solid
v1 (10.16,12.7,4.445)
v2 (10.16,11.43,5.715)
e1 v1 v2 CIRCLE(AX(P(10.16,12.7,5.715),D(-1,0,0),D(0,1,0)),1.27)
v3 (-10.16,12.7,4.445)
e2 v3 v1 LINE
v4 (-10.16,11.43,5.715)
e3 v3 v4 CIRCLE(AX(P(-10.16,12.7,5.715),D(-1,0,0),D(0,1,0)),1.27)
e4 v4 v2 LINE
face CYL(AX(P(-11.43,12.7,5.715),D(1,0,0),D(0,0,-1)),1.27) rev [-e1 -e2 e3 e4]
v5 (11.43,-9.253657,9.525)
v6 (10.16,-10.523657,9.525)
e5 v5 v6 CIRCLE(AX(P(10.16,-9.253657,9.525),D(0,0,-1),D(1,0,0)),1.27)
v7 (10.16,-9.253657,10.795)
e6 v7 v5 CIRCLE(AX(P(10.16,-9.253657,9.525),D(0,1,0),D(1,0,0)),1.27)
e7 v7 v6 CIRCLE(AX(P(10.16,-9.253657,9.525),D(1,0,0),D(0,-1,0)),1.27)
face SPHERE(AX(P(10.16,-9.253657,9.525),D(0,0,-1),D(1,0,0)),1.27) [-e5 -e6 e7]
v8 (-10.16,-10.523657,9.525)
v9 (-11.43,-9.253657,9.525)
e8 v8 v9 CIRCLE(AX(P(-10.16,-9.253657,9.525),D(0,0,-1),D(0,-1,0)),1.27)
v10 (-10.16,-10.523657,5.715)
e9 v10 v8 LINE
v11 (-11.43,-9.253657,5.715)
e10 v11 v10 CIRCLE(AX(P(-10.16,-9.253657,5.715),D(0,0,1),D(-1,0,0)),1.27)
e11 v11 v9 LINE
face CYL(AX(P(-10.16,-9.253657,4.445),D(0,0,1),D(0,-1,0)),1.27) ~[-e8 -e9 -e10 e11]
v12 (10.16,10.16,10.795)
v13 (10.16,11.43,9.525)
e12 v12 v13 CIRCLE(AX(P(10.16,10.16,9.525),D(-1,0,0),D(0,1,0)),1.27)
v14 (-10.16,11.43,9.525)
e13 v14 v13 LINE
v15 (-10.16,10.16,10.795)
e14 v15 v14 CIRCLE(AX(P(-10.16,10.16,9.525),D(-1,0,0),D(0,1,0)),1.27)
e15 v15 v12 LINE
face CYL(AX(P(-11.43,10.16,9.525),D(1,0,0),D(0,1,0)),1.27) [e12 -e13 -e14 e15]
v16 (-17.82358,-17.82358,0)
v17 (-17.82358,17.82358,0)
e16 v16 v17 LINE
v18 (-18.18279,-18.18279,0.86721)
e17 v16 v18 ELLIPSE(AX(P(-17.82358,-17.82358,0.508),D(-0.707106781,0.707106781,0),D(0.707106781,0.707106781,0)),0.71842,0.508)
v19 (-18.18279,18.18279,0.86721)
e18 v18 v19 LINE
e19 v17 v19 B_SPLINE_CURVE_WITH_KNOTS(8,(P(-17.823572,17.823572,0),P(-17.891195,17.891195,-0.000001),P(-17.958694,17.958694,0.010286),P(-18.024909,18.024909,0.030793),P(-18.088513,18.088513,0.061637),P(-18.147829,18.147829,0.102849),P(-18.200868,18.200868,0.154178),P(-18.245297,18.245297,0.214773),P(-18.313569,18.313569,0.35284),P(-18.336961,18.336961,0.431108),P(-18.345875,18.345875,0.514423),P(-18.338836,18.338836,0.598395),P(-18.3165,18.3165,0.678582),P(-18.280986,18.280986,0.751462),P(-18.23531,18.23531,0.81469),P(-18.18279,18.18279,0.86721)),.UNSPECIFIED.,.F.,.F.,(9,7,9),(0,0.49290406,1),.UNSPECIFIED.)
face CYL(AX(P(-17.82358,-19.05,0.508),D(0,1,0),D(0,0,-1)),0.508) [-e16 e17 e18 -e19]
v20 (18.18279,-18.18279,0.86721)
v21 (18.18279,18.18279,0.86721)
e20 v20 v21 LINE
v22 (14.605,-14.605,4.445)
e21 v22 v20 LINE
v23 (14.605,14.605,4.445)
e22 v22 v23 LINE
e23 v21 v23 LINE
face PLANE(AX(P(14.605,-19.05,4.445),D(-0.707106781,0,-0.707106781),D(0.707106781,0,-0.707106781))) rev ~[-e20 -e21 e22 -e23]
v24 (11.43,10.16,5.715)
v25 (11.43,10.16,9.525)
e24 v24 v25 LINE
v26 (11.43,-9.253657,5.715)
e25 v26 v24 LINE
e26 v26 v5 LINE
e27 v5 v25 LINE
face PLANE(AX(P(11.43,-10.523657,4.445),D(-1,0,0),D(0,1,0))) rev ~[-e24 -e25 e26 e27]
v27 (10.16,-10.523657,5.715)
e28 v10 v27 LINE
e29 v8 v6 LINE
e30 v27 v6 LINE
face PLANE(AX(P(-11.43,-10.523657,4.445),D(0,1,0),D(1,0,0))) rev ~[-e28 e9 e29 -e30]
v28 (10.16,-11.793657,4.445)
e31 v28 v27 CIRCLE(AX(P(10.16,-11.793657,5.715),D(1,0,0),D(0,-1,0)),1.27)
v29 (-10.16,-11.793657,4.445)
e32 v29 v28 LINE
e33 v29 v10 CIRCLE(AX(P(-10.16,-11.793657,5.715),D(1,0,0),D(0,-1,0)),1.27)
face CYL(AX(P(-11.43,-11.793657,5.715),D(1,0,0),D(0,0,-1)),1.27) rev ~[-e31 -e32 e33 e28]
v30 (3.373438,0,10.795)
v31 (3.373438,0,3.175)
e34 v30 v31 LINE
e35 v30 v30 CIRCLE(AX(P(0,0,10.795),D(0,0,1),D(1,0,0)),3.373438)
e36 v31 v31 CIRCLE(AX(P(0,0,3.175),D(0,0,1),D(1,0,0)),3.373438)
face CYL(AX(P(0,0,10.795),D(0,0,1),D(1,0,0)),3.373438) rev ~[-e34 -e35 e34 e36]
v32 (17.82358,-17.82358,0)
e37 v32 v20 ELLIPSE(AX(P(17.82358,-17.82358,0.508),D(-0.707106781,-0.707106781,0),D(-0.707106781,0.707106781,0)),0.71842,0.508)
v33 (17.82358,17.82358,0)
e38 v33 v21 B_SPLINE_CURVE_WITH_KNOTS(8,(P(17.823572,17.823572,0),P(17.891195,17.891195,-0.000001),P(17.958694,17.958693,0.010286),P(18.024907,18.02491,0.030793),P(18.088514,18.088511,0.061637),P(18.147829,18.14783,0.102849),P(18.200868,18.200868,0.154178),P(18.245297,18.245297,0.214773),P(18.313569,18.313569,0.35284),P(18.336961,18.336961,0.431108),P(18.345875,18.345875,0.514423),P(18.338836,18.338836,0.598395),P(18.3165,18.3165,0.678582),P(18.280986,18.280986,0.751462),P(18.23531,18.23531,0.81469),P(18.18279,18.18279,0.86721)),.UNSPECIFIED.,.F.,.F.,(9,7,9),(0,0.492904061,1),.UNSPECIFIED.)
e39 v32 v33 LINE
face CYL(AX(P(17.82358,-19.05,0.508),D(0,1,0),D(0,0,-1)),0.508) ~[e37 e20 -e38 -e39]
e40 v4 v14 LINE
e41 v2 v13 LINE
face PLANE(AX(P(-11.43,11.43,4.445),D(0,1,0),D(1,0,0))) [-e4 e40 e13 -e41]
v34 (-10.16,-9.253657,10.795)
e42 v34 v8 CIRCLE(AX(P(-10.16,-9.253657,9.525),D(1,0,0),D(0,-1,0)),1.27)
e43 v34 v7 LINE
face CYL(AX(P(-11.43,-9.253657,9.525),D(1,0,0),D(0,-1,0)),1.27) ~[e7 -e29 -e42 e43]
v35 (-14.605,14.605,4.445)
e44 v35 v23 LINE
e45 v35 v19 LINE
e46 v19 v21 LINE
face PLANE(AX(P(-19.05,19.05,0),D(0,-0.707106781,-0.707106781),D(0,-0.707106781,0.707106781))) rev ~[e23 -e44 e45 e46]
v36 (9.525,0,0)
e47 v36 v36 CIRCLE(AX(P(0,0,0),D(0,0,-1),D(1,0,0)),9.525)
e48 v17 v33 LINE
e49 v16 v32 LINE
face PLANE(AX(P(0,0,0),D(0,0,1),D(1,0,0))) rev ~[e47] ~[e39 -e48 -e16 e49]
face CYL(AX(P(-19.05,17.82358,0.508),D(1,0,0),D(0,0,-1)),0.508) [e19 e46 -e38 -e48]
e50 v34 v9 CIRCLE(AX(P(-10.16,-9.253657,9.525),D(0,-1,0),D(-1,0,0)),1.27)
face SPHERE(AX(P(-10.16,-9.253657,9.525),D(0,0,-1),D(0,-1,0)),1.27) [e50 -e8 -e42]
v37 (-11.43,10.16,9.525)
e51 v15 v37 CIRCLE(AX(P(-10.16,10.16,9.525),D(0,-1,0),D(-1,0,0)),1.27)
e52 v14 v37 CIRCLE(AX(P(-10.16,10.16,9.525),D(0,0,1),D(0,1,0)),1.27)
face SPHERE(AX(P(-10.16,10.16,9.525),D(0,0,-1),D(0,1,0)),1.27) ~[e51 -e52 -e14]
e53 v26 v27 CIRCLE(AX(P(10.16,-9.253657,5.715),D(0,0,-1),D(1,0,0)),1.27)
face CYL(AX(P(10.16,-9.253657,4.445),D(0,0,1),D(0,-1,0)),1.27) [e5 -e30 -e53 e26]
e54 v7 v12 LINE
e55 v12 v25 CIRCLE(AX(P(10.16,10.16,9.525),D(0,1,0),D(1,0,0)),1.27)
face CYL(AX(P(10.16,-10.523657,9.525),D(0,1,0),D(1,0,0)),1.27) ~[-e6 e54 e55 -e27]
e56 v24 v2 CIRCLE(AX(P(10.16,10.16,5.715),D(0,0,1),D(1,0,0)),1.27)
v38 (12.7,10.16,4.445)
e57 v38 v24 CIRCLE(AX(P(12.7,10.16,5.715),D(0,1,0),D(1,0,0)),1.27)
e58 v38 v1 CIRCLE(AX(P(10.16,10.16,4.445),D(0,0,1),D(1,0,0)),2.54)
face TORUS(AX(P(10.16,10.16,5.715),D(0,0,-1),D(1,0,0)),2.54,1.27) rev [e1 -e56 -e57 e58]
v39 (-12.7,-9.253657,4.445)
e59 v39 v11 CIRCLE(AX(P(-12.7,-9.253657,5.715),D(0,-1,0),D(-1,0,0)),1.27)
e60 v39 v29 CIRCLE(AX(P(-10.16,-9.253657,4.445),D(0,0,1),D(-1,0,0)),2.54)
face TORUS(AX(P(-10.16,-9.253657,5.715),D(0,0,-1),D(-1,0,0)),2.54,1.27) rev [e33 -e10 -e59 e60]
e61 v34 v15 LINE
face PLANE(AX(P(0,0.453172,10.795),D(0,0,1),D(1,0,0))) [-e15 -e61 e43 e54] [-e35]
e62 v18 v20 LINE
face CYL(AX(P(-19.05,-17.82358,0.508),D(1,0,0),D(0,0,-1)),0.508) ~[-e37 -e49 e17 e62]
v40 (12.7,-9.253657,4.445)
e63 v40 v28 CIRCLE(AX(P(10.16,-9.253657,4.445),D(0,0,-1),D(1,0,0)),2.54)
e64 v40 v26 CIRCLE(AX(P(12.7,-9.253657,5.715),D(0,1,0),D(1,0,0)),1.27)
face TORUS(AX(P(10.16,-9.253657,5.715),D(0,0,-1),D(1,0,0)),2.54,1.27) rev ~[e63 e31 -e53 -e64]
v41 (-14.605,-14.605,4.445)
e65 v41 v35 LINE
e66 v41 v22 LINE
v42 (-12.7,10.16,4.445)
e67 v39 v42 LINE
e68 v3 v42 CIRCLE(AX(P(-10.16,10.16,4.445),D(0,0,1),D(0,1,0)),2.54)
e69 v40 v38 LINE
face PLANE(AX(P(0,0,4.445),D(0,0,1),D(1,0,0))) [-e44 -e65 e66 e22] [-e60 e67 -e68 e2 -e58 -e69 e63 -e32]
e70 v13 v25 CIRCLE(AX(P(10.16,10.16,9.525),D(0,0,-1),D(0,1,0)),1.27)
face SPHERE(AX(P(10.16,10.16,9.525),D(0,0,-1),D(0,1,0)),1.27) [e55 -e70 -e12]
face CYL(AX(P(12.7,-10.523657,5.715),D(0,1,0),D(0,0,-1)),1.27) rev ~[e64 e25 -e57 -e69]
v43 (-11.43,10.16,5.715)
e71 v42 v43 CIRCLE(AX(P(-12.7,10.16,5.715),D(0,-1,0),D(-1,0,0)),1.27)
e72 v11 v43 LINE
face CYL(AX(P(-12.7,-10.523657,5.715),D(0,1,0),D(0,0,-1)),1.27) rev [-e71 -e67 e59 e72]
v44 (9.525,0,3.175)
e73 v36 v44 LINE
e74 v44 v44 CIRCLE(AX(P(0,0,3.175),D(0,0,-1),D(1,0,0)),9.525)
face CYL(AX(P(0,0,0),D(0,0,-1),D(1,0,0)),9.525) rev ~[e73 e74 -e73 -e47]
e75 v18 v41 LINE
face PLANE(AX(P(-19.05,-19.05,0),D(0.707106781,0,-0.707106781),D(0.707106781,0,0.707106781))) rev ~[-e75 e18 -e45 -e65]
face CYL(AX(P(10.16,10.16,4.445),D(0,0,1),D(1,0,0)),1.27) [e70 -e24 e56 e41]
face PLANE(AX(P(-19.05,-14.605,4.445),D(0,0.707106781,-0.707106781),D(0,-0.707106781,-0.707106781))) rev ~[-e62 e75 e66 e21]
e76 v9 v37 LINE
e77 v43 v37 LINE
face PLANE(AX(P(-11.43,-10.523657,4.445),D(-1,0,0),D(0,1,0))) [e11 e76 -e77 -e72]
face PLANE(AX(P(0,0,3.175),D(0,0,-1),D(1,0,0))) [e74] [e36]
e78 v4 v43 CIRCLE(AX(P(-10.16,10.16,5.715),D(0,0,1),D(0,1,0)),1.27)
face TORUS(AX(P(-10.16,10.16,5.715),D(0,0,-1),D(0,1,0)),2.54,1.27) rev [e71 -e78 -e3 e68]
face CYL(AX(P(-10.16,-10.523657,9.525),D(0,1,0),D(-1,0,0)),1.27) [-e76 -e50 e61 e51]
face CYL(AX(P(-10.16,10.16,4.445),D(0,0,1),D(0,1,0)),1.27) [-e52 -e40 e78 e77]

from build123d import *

# Parameters (mm, degrees)
F0_W      = 38.1
F0_H      = 38.1
F1_DEPTH  = 4.445
F4_DEPTH  = 38.101
F5_DEPTH  = 38.101
F6_R      = 0.508
F7_W      = 22.86
F7_H      = 21.9536569705
F8_DEPTH  = 6.35
F9_R      = 3.3734375
F10_DEPTH = 10.7965917968
F11_R     = 9.525
F12_DEPTH = 3.175
F13_R     = 1.27


with BuildPart() as f1:
    # F0 (on Top) → F1 (new body)
    with BuildSketch(Plane.XY):
        Rectangle(F0_W, F0_H)
    extrude(amount=F1_DEPTH)

    # F2 (on face) → F4 (cut, through all)
    with BuildSketch(Plane.XZ.offset(19.05)):
        Polygon((-19.05, 4.445), (-19.05, 0), (-14.605, 4.445), align=None)
        Polygon((14.605, 4.445), (19.05, 0), (19.05, 4.445), align=None)
    extrude(amount=-F4_DEPTH, mode=Mode.SUBTRACT)

    # F3 (on face) → F5 (cut, through all)
    with BuildSketch(Plane(origin=(-19.05, 0, 0), x_dir=(0, -1, 0), z_dir=(-1, 0, 0))):
        Polygon((-19.05, 4.445), (-19.05, 0), (-14.605, 4.445), align=None)
        Polygon((14.605, 4.445), (19.05, 0), (19.05, 4.445), align=None)
    extrude(amount=-F5_DEPTH, mode=Mode.SUBTRACT)

    # F6
    f6_edges = [f1.edges().sort_by_distance(p)[0] for p in [
        (19.05, 0, 0),
        (0, -19.05, 0),
        (-19.05, 0, 0),
        (0, 19.05, 0),
    ]]
    fillet(f6_edges, radius=F6_R)

    # F7 (on face) → F8 (join)
    with BuildSketch(Plane.XY.offset(4.445)):
        with Locations((0, 0.4531715147)):
            Rectangle(F7_W, F7_H)
    extrude(amount=F8_DEPTH)

    # F9 (on face) → F10 (cut, through all)
    with BuildSketch(Plane.XY.offset(10.795)):
        Circle(F9_R)
    extrude(amount=-F10_DEPTH, mode=Mode.SUBTRACT)

    # F11 (on face) → F12 (cut)
    with BuildSketch(Plane(origin=(0, 0, 0), x_dir=(1, 0, 0), z_dir=(0, 0, -1))):
        Circle(F11_R)
    extrude(amount=-F12_DEPTH, mode=Mode.SUBTRACT)

    # F13
    f13_edges = [f1.edges().sort_by_distance(p)[0] for p in [
        (-11.43, 0.453172, 4.445),
        (0, -10.523657, 4.445),
        (-11.43, -10.523657, 7.62),
        (-11.43, 11.43, 7.62),
        (11.43, 11.43, 7.62),
        (11.43, -10.523657, 7.62),
        (0, 11.43, 10.795),
        (11.43, 0.453172, 10.795),
        (0, -10.523657, 10.795),
        (-18.18279, 0, 0.86721),
        (-11.43, 0.453172, 10.795),
        (11.43, 0.453172, 4.445),
        (0, 11.43, 4.445),
    ]]
    fillet(f13_edges, radius=F13_R)


solid = f1.part
